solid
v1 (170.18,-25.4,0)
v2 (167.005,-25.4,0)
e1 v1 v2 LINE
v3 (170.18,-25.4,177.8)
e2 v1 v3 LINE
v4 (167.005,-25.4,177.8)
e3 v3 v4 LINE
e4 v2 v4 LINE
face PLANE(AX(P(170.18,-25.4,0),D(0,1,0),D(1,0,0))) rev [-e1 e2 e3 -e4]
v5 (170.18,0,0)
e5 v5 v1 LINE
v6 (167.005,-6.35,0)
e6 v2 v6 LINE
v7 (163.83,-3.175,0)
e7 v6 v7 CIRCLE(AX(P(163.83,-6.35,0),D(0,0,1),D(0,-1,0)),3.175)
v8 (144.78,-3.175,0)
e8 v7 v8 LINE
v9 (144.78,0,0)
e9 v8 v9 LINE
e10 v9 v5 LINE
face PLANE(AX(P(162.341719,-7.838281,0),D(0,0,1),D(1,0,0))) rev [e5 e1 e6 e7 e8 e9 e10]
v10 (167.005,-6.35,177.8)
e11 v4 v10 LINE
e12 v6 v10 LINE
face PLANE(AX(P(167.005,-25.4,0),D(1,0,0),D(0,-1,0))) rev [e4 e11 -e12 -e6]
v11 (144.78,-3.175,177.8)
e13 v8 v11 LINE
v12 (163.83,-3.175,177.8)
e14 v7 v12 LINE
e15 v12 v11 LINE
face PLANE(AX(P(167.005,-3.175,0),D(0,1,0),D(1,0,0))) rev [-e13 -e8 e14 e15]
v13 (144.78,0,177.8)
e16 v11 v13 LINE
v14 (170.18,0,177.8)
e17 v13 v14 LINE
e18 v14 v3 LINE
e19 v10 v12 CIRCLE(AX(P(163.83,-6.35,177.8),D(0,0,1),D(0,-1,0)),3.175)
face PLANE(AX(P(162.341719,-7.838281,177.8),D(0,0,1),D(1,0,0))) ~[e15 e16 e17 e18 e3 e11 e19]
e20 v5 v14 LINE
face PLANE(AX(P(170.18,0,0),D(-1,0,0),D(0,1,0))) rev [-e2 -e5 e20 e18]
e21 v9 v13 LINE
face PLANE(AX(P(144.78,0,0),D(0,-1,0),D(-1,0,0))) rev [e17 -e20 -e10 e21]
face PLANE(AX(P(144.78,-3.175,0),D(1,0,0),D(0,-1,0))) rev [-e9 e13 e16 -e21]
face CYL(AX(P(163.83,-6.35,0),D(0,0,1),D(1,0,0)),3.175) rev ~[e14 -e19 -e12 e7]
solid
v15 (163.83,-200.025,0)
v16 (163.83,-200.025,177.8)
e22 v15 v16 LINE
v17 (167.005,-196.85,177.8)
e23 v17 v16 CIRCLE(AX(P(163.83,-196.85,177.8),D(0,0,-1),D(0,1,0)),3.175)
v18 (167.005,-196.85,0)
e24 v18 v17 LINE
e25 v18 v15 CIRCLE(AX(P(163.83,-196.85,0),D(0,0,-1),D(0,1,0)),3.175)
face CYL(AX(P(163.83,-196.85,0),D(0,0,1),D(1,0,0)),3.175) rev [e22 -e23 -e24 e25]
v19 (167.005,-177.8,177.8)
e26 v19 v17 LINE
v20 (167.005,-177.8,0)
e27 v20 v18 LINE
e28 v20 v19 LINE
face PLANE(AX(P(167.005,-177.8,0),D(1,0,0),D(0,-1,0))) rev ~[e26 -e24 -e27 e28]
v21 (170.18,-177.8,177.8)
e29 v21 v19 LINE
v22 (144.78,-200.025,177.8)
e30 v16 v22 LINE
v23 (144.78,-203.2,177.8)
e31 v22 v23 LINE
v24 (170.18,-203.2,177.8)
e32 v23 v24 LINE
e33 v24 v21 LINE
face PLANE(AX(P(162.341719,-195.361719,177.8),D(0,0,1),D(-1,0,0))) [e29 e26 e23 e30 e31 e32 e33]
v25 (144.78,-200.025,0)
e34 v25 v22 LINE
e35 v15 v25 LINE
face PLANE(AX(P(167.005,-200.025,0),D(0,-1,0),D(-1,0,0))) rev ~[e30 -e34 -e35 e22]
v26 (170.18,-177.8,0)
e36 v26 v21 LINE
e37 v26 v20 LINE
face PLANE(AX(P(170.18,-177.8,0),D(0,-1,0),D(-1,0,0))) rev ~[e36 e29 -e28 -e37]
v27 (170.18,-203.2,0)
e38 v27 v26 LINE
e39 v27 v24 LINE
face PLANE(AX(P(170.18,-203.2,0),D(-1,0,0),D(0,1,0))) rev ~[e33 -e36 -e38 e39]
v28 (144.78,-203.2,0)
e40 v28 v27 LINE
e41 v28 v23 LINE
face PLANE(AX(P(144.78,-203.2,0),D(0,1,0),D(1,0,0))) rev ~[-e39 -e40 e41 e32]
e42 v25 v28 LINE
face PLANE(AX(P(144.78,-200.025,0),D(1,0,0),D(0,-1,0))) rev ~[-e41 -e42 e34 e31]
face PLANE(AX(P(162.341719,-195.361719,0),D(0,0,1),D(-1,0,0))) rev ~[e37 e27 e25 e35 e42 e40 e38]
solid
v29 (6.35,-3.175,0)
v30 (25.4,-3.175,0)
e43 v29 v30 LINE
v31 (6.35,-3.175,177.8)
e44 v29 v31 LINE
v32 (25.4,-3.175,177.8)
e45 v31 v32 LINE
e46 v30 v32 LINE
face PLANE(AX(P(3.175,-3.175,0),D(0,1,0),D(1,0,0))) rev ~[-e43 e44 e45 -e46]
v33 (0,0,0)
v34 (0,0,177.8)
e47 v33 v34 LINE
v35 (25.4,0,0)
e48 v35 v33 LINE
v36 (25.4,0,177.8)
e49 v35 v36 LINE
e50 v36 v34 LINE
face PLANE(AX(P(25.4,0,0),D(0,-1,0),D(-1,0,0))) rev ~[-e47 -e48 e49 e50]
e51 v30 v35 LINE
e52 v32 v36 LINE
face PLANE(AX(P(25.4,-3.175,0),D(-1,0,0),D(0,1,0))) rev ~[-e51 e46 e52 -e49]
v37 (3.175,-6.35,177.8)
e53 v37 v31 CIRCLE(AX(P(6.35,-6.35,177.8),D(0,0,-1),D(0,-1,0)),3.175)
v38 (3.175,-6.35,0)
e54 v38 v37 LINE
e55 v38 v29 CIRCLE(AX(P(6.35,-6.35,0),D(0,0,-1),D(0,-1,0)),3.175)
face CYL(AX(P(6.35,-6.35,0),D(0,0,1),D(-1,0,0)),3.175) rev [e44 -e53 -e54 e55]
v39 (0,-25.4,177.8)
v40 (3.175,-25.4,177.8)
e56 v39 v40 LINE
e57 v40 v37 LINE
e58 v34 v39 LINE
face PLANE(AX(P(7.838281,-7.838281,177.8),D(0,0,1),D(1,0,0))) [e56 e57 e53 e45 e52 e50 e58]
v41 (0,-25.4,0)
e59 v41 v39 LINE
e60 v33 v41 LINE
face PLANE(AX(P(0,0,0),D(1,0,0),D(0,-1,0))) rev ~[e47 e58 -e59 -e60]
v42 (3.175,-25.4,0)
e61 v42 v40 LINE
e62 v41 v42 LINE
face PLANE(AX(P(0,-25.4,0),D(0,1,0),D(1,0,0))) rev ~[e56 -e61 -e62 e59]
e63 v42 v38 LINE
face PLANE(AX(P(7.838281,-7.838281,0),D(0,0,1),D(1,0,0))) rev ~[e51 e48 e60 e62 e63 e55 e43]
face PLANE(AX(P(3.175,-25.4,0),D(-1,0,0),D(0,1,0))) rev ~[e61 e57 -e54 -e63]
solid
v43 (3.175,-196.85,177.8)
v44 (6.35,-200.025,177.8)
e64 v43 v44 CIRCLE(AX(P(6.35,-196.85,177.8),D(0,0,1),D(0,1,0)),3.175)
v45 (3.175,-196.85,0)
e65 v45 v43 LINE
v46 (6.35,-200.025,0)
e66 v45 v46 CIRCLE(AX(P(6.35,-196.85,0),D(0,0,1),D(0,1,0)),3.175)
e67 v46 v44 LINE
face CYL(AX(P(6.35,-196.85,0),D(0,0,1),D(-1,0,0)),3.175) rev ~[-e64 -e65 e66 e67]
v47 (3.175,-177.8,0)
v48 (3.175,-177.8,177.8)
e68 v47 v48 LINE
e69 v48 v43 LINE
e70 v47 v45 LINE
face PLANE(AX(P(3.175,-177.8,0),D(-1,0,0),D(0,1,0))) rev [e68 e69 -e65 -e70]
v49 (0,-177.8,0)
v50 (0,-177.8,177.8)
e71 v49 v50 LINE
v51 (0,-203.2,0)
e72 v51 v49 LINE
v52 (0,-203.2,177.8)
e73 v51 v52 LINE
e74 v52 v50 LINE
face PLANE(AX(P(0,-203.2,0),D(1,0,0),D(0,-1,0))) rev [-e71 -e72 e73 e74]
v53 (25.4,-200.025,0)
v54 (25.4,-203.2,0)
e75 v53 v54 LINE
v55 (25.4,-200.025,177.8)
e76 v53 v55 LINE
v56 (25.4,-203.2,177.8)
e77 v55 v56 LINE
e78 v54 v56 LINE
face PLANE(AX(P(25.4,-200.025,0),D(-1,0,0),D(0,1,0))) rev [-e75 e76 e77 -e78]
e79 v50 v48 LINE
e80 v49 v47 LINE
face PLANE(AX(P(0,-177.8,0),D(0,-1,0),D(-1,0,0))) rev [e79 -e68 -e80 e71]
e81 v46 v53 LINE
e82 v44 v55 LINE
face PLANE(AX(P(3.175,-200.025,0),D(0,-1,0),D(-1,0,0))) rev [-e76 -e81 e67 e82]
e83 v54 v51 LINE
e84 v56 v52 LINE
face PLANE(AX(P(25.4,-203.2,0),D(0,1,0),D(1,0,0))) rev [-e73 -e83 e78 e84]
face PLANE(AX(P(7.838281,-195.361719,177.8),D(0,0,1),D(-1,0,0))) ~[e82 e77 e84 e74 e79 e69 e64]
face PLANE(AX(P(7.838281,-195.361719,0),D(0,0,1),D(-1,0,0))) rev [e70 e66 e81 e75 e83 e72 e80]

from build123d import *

# Parameters (mm, degrees)
F1_DEPTH = 177.8
F4_R     = 3.175


# Not quite as in the source:
# - a length typed as a fraction of an inch, garbled in the dataset ("3 / 203.2 mm" for 3/8 in), is restored


with BuildPart() as f1:
    # F0 (on Top) → F1 (new body)
    with BuildSketch(Plane.XY):
        Polygon((25.4, 0), (0, 0), (0, -25.4), (3.175, -25.4), (3.175, -3.175), (25.4, -3.175), align=None)
    extrude(amount=F1_DEPTH)

    # F4
    f4_edges = [f1.edges().sort_by_distance(p)[0] for p in [
        (3.175, -3.175, 88.9),
    ]]
    fillet(f4_edges, radius=F4_R)


with BuildPart() as f5_1:
    # F5: instance of F1
    add(f1.part.mirror(Plane.XZ.offset(101.6)))


with BuildPart() as f6_1:
    # F6: instance of F1
    add(f1.part.mirror(Plane.YZ.offset(85.09)))


with BuildPart() as f6_2:
    # F6: instance of F5_1
    add(f5_1.part.mirror(Plane.YZ.offset(85.09)))


solid = Compound([f1.part, f5_1.part, f6_1.part, f6_2.part])
